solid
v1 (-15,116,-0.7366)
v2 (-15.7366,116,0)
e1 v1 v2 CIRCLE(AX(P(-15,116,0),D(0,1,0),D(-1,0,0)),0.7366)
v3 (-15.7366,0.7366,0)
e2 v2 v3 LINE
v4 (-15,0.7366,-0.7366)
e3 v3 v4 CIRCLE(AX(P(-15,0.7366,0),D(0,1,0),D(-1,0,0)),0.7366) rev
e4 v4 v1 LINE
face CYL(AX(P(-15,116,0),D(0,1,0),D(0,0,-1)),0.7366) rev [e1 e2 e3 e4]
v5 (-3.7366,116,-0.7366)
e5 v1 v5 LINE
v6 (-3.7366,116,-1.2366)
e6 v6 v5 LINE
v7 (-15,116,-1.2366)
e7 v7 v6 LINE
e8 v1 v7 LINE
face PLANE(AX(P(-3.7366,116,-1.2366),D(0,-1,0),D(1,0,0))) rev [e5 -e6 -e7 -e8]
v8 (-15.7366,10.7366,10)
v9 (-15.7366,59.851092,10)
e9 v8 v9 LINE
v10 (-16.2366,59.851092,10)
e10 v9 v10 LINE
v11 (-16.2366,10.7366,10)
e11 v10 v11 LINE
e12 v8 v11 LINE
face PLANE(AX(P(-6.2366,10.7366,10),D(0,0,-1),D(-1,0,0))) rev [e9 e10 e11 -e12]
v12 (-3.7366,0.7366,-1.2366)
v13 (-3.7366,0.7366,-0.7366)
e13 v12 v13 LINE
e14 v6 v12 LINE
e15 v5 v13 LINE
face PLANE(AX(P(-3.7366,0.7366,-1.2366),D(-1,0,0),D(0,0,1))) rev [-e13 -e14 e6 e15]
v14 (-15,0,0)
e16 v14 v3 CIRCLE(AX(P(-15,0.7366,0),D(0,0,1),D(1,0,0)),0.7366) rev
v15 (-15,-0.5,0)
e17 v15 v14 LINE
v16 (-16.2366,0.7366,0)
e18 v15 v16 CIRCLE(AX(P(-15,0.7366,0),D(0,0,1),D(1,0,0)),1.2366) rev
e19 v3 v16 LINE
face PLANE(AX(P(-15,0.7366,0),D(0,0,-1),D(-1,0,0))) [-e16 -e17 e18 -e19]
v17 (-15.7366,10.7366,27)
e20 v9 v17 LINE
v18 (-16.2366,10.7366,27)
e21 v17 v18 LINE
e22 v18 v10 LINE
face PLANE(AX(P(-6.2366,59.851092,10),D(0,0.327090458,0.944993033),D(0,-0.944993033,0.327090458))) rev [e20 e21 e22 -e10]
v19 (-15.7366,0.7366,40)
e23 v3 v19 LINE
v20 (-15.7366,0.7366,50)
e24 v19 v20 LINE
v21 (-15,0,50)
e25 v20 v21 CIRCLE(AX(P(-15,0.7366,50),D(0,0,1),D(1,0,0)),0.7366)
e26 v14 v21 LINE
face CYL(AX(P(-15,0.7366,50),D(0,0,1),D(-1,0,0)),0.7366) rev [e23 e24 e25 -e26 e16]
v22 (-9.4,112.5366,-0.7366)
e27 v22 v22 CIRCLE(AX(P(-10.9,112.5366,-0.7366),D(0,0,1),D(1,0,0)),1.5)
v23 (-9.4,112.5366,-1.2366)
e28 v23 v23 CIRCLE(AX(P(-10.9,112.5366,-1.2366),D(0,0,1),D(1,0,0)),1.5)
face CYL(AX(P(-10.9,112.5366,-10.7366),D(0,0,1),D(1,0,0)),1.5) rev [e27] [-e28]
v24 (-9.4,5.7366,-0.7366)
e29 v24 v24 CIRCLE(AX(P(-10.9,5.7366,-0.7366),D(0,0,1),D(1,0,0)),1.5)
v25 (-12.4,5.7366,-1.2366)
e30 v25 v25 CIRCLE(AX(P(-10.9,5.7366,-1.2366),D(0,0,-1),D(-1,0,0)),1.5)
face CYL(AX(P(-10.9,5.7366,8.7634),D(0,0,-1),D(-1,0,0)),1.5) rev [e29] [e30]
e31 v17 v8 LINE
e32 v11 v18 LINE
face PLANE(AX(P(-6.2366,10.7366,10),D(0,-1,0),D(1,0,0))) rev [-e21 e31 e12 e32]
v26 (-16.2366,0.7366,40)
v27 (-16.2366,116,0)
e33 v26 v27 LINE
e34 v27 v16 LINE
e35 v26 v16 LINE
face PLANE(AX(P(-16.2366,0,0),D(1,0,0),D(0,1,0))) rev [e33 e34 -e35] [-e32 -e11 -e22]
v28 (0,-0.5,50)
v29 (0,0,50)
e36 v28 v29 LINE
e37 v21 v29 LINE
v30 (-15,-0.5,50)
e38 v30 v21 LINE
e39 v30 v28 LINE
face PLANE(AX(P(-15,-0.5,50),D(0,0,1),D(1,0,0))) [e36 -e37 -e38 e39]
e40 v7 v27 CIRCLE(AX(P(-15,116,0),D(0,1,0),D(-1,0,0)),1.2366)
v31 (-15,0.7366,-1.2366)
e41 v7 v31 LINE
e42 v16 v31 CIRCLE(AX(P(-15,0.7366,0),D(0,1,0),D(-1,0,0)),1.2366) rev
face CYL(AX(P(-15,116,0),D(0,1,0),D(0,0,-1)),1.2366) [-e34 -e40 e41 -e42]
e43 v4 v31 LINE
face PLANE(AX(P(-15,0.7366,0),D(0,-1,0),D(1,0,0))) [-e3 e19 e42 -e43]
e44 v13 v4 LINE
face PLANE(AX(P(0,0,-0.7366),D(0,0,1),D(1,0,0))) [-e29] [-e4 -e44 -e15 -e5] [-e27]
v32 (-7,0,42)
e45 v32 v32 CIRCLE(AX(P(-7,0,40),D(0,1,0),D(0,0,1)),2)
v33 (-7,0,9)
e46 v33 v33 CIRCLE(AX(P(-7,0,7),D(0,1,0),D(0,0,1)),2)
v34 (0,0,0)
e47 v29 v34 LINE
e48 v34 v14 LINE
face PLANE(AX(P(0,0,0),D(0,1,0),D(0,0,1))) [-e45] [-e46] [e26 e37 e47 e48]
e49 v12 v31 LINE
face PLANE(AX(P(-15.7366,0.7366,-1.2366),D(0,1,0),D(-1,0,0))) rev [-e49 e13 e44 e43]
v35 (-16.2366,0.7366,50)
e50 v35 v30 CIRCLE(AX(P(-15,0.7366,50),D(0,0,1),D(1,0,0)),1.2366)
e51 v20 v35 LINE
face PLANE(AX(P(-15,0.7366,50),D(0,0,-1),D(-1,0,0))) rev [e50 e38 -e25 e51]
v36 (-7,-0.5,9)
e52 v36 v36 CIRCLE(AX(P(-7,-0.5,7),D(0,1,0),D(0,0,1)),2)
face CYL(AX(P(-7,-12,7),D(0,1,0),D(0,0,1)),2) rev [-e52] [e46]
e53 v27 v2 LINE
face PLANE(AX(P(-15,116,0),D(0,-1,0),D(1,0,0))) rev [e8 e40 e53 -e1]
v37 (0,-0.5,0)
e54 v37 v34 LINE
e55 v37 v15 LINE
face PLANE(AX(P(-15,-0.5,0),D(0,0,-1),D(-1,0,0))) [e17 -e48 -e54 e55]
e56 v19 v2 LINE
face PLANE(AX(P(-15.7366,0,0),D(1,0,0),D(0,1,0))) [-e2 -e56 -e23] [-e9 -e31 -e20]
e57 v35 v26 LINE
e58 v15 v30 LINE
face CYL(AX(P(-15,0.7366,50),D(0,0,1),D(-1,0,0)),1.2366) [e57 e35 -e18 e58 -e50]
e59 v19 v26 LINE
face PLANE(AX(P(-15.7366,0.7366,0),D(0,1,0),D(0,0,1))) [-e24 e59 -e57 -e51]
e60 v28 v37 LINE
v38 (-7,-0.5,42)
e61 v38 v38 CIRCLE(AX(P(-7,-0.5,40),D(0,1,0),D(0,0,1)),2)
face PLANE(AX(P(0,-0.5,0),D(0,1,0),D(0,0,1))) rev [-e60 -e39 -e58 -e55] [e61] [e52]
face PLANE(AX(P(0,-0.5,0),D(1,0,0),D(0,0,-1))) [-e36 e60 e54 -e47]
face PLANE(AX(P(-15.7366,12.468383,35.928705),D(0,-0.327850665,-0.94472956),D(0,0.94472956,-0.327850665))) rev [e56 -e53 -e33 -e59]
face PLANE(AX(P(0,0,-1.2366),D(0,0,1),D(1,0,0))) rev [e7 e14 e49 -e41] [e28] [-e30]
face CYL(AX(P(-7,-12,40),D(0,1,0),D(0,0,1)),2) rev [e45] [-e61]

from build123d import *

# Parameters (mm, degrees)
SKETCH2_W          = 15
SKETCH2_H          = 50
BASE_FLANGE1_DEPTH = 0.5
EDGE_FLANGE1_DEPTH = 50
CUT_EXTRUDE1_DEPTH = 10
EDGE_FLANGE2_DEPTH = 115.2634
CUT_EXTRUDE2_DEPTH = 10
SKETCH13_R         = 1.5
CUT_EXTRUDE3_DEPTH = 10
SKETCH14_R         = 1.5
CUT_EXTRUDE4_DEPTH = 10
SKETCH15_R         = 2
CUT_EXTRUDE5_DEPTH = 12
SKETCH16_R         = 2
CUT_EXTRUDE6_DEPTH = 12


# Sheet-metal steps are written as plain solids
with BuildPart() as part:
    # Sketch2 → Base-Flange1 (new body)
    with BuildSketch(Plane(origin=(0, 0, 0), x_dir=(1, 0, 0), z_dir=(0, 1, 0))):
        with Locations((-7.5, -25)):
            Rectangle(SKETCH2_W, SKETCH2_H)
    extrude(amount=-BASE_FLANGE1_DEPTH)

    # Edge-Flange1 section (across the edge) → Edge-Flange1 (add)
    with BuildSketch(Plane(origin=(-15.7366, 0, 0), x_dir=(1, 0, 0), z_dir=(0, 0, 1))):
        with BuildLine():
            Line((-0.5, 0.7366), (-0.5, 116))
            Line((-0.5, 116), (0, 116))
            Line((0, 116), (0, 0.7366))
            ThreePointArc((0, 0.7366), (0.215745145, 0.215745145), (0.7366, 0))
            Line((0.7366, 0), (0.7366, -0.5))
            ThreePointArc((0.7366, -0.5), (-0.137808246, -0.137808246), (-0.5, 0.7366))
        make_face()
    extrude(amount=EDGE_FLANGE1_DEPTH)

    # Sketch8 → Cut-Extrude1 (cut)
    with BuildSketch(Plane.ZY.offset(16.2366)):
        Polygon((40, 0.7366), (0, 116), (50, 116), (50, 0.7366), align=None)
    extrude(amount=-CUT_EXTRUDE1_DEPTH, mode=Mode.SUBTRACT)

    # Edge-Flange2 section (across the edge) → Edge-Flange2 (add)
    with BuildSketch(Plane(origin=(-15.7366, 0.7366, -0.7366), x_dir=(0, 0, 1), z_dir=(0, 1, 0))):
        with BuildLine():
            Line((-0.5, 0.7366), (-0.5, 12))
            Line((-0.5, 12), (0, 12))
            Line((0, 12), (0, 0.7366))
            ThreePointArc((0, 0.7366), (0.215745145, 0.215745145), (0.7366, 0))
            Line((0.7366, 0), (0.7366, -0.5))
            ThreePointArc((0.7366, -0.5), (-0.137808246, -0.137808246), (-0.5, 0.7366))
        make_face()
    extrude(amount=EDGE_FLANGE2_DEPTH)

    # Sketch12 → Cut-Extrude2 (cut)
    with BuildSketch(Plane.ZY.offset(16.2366)):
        Polygon((10, 59.851091606), (27, 10.7366), (10, 10.7366), align=None)
    extrude(amount=-CUT_EXTRUDE2_DEPTH, mode=Mode.SUBTRACT)

    # Sketch13 → Cut-Extrude3 (cut)
    with BuildSketch(Plane(origin=(0, 0, -1.2366), x_dir=(-1, 0, 0), z_dir=(0, 0, -1))):
        with Locations((10.9, 5.7366)):
            Circle(SKETCH13_R)
    extrude(amount=-CUT_EXTRUDE3_DEPTH, mode=Mode.SUBTRACT)

    # Sketch14 → Cut-Extrude4 (cut)
    with BuildSketch(Plane.XY.offset(-0.7366)):
        with Locations((-10.9, 112.5366)):
            Circle(SKETCH14_R)
    extrude(amount=-CUT_EXTRUDE4_DEPTH, mode=Mode.SUBTRACT)

    # Sketch15 → Cut-Extrude5 (cut)
    with BuildSketch(Plane(origin=(0, 0, 0), x_dir=(1, 0, 0), z_dir=(0, 1, 0))):
        with Locations(Location((-7, -40, 0), (0, 0, 270))):
            Circle(SKETCH15_R)
    extrude(amount=-CUT_EXTRUDE5_DEPTH, mode=Mode.SUBTRACT)

    # Sketch16 → Cut-Extrude6 (cut)
    with BuildSketch(Plane(origin=(0, 0, 0), x_dir=(1, 0, 0), z_dir=(0, 1, 0))):
        with Locations(Location((-7, -7, 0), (0, 0, 270))):
            Circle(SKETCH16_R)
    extrude(amount=-CUT_EXTRUDE6_DEPTH, mode=Mode.SUBTRACT)


solid = part.part
